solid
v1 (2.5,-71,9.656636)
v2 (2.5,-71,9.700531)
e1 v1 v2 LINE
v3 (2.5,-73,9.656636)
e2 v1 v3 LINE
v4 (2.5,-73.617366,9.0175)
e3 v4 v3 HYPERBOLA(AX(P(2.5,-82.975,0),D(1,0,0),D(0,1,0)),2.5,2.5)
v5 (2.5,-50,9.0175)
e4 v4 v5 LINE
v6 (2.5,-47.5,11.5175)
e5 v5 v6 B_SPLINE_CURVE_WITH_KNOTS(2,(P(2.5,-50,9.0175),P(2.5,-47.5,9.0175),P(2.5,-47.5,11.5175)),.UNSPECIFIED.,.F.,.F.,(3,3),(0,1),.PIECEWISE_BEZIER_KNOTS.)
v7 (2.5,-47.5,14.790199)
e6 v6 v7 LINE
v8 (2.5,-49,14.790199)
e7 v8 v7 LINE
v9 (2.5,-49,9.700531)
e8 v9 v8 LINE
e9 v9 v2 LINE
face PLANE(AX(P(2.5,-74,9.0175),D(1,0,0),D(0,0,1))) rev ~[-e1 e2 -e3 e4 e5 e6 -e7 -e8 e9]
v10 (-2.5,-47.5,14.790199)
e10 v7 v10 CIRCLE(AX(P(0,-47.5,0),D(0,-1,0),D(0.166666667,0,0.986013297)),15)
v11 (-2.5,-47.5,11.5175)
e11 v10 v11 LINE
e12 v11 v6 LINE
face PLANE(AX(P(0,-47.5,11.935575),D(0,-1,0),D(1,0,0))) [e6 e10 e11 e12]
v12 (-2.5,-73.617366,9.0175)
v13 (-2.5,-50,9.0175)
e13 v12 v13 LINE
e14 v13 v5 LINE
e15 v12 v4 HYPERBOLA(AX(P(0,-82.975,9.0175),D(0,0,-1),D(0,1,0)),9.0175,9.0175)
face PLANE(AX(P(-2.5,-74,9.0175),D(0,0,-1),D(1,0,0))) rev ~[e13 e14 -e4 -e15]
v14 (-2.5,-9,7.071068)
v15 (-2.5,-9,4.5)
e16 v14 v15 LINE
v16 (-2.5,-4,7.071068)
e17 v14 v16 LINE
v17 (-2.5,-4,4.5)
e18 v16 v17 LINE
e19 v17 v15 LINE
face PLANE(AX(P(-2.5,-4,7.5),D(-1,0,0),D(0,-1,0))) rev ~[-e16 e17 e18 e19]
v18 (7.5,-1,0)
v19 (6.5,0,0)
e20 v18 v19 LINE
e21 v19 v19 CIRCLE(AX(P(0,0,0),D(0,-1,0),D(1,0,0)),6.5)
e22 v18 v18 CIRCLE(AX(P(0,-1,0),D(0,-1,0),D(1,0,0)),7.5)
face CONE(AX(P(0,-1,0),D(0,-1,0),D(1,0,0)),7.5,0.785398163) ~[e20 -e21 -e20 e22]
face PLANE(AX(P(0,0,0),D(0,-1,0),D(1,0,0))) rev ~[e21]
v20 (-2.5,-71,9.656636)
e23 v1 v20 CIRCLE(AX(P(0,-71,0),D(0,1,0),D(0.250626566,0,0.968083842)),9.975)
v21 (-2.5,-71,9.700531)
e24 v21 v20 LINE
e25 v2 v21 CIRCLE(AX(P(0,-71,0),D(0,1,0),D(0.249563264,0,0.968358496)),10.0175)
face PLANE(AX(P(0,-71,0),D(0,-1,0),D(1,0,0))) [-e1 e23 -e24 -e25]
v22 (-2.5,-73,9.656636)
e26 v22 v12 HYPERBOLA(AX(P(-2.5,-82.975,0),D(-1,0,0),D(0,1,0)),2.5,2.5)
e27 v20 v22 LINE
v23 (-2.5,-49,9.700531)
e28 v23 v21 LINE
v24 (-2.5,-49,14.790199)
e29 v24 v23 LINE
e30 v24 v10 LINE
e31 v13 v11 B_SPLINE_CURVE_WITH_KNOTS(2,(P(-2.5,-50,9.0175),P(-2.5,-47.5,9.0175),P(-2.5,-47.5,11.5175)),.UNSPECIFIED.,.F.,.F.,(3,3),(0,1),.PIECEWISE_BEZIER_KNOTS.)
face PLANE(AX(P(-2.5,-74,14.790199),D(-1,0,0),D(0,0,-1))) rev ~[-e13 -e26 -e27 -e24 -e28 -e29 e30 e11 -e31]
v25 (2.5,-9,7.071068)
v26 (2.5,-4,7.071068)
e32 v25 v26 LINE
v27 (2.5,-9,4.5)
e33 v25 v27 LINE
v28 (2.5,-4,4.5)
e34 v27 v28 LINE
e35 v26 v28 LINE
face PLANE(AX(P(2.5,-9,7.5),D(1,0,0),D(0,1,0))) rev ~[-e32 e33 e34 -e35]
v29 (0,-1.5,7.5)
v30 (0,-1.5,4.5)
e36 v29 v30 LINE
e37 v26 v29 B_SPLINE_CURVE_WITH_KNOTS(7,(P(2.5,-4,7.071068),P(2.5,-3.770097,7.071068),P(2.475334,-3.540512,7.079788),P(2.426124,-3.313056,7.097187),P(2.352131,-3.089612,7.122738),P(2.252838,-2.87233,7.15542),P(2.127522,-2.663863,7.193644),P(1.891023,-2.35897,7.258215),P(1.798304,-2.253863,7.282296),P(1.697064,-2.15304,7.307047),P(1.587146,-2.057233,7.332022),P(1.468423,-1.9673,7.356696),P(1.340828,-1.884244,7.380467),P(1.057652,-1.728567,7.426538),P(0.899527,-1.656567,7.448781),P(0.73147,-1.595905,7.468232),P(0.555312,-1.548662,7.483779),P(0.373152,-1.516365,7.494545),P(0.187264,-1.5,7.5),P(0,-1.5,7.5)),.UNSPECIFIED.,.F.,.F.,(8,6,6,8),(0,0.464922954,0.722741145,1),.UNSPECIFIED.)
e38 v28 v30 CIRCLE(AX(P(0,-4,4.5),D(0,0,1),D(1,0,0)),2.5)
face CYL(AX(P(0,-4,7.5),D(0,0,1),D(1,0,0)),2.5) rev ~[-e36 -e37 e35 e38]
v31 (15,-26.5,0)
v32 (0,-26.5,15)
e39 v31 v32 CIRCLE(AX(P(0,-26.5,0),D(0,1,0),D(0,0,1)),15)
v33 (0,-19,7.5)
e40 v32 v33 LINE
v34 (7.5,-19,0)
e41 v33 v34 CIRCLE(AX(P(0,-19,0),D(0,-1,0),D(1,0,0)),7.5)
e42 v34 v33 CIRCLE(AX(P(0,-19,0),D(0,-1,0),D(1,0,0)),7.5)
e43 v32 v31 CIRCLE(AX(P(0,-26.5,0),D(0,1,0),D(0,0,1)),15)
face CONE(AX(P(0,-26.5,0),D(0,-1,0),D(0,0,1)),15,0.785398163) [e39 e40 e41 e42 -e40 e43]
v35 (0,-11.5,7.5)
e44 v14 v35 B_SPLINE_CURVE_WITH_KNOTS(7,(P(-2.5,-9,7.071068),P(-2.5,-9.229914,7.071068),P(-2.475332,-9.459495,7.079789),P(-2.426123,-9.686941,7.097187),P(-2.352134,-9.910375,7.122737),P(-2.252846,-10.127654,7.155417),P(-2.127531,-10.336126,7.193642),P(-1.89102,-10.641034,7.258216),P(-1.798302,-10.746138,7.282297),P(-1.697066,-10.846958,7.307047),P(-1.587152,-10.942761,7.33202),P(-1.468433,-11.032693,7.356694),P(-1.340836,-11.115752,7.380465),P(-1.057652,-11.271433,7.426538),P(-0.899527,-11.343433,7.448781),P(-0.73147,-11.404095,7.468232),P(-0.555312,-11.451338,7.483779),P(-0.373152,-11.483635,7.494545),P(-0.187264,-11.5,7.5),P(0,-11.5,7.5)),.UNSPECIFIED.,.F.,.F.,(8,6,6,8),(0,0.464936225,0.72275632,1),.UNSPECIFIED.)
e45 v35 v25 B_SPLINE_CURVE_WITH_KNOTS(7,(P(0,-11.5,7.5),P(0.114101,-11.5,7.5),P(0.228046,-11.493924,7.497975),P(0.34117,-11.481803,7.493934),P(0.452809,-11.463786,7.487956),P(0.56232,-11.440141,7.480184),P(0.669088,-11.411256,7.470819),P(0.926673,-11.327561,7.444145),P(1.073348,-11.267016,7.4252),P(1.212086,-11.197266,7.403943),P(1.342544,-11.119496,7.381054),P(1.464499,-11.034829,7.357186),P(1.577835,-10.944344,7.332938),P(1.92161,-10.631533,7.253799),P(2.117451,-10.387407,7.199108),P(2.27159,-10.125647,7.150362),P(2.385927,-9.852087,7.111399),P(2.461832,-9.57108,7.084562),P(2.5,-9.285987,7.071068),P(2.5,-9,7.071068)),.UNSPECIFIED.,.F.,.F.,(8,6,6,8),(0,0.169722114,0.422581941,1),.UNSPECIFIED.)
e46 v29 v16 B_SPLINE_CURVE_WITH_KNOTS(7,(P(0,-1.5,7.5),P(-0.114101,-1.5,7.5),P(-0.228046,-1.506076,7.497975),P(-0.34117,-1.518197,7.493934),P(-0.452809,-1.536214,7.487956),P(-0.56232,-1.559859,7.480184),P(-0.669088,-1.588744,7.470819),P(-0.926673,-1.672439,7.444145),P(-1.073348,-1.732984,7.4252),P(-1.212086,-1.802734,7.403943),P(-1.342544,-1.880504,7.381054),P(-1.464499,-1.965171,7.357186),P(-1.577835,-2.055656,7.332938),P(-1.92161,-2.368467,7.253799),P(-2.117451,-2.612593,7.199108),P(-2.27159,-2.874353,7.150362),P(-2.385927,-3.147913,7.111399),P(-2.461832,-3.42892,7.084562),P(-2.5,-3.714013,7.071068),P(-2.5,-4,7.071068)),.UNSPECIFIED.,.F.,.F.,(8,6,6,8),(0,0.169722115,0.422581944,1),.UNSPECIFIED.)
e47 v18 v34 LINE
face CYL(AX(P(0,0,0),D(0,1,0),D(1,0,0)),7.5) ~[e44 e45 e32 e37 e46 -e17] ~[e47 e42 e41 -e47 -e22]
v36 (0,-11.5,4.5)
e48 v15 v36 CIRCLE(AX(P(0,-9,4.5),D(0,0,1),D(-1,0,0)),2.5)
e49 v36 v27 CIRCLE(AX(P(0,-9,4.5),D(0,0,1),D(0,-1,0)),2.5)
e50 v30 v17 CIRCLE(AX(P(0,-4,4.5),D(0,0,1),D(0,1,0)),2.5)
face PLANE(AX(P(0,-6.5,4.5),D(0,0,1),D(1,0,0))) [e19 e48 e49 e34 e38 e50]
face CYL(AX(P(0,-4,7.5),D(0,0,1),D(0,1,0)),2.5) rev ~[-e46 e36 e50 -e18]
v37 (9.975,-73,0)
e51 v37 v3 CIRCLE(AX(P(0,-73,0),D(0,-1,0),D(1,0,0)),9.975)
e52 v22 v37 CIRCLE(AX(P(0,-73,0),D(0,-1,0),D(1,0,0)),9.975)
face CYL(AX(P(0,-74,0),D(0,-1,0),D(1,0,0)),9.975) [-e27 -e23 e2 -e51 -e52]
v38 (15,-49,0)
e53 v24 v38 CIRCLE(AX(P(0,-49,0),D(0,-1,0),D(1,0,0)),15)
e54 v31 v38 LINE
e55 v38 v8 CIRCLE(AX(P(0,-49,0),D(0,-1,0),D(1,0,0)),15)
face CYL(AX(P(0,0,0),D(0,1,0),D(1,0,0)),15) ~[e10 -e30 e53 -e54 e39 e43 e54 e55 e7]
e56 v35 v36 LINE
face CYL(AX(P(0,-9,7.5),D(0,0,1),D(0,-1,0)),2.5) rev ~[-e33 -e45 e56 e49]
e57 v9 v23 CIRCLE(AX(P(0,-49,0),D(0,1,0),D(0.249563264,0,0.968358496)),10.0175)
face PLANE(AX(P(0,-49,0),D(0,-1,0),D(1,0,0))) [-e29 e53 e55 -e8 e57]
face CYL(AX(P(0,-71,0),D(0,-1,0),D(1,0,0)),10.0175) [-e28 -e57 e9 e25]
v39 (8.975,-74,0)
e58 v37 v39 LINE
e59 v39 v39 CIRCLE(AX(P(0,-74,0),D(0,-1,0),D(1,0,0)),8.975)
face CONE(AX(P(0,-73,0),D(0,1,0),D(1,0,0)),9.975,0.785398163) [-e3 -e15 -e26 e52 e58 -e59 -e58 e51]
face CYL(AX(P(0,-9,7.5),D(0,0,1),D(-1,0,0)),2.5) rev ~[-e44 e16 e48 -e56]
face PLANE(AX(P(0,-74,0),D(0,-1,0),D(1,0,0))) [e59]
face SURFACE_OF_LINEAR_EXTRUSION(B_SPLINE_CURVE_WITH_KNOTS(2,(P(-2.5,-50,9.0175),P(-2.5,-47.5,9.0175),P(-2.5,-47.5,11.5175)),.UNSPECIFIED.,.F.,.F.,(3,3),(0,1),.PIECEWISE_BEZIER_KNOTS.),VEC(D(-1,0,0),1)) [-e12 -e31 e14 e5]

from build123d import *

# Parameters (mm, degrees)
F0_R         = 15
F1_DEPTH     = 74
F2_R         = 15
F2_R_2       = 9.975
F3_DEPTH     = 3
F4_R         = 15
F4_R_2       = 10.0175
F5_DEPTH     = 22
F6_R         = 15
F6_R_2       = 7.5
F7_DEPTH     = 19
F8_SIZE2     = 1
F8_SIZE      = 1
F12_DEPTH    = 26.5
F13_T1_DEPTH = 5
F16_DEPTH    = 3


# Not quite as in the source:
# - a fillet or chamfer that OpenCascade refuses, or shapes differently, is made with other operations: its cross-section is extruded or revolved along the edge and cut away or added


with BuildPart() as f1:
    # F0 (on Front) → F1 (new body)
    with BuildSketch(Plane.XZ):
        Circle(F0_R)
    extrude(amount=F1_DEPTH)

    # F2 (on face) → F3 (cut)
    with BuildSketch(Plane.XZ.offset(74)):
        Circle(F2_R)
        Circle(F2_R_2, mode=Mode.SUBTRACT)
    extrude(amount=-F3_DEPTH, mode=Mode.SUBTRACT)

    # F4 (on face) → F5 (cut)
    with BuildSketch(Plane.XZ.offset(71)):
        Circle(F4_R)
        Circle(F4_R_2, mode=Mode.SUBTRACT)
    extrude(amount=-F5_DEPTH, mode=Mode.SUBTRACT)

    # F6 (on Front) → F7 (cut)
    with BuildSketch(Plane.XZ):
        Circle(F6_R)
        Circle(F6_R_2, mode=Mode.SUBTRACT)
    extrude(amount=F7_DEPTH, mode=Mode.SUBTRACT)

    # F8
    f8_edges = [f1.edges().sort_by_distance(p)[0] for p in [
        (-7.5, 0, 0),
        (-9.975, -74, 0),
    ]]
    chamfer(f8_edges, length=F8_SIZE, length2=F8_SIZE2)

    # F9 (on Right) → F10 (revolve, cut)
    with BuildSketch(Plane.YZ):
        Polygon((-26.5, 15), (-19, 7.5), (-19, 15), align=None)
    revolve(axis=Axis((0, -22.75, 0), (0, 1, 0)), mode=Mode.SUBTRACT)

    # F11 (on face) → F12 (cut)
    with BuildSketch(Plane.XZ.offset(74)):
        with BuildLine():
            Line((-2.5, 14.7901994577), (-2.5, 10.0175))
            Line((-2.5, 10.0175), (-2.5, 9.0175))
            Line((-2.5, 9.0175), (0, 9.0175))
            Line((0, 9.0175), (2.5, 9.0175))
            Line((2.5, 9.0175), (2.5, 10.0175))
            Line((2.5, 10.0175), (2.5, 14.7901994577))
            ThreePointArc((2.5, 14.7901994577), (0, 15), (-2.5, 14.7901994577))
        make_face()
    extrude(amount=-F12_DEPTH, mode=Mode.SUBTRACT)

    # F13: fillet of radius 2.5 on 1 edges, made by hand

    # F13_s2 → F13_t1 (join)
    with BuildSketch(Plane.YZ.offset(-2.5)):
        with BuildLine():
            add(Edge.make_bspline(
                [(-50, 9.0175), (-47.5, 9.0175), (-47.5, 11.5175)],
                knots=[0, 0, 0, 1, 1, 1], degree=2, weights=[1, 1, 1]))
            Line((-47.5, 11.5175), (-47.45, 11.5175))
            Line((-47.45, 11.5175), (-47.45, 8.9675))
            Line((-47.45, 8.9675), (-50, 8.9675))
            Line((-50, 8.9675), (-50, 9.0175))
        make_face()
    extrude(amount=F13_T1_DEPTH)

    # F15 (on offset) → F16 (cut)
    with BuildSketch(Plane.XY.offset(7.5)):
        with BuildLine():
            Line((2.5, -9), (2.5, -4))
            ThreePointArc((2.5, -4), (1.767766953, -2.232233047), (0, -1.5))
            ThreePointArc((0, -1.5), (-1.767766953, -2.232233047), (-2.5, -4))
            Line((-2.5, -4), (-2.5, -9))
            ThreePointArc((-2.5, -9), (-1.767766953, -10.767766953), (0, -11.5))
            ThreePointArc((0, -11.5), (1.767766953, -10.767766953), (2.5, -9))
        make_face()
    extrude(amount=-F16_DEPTH, mode=Mode.SUBTRACT)


solid = f1.part
